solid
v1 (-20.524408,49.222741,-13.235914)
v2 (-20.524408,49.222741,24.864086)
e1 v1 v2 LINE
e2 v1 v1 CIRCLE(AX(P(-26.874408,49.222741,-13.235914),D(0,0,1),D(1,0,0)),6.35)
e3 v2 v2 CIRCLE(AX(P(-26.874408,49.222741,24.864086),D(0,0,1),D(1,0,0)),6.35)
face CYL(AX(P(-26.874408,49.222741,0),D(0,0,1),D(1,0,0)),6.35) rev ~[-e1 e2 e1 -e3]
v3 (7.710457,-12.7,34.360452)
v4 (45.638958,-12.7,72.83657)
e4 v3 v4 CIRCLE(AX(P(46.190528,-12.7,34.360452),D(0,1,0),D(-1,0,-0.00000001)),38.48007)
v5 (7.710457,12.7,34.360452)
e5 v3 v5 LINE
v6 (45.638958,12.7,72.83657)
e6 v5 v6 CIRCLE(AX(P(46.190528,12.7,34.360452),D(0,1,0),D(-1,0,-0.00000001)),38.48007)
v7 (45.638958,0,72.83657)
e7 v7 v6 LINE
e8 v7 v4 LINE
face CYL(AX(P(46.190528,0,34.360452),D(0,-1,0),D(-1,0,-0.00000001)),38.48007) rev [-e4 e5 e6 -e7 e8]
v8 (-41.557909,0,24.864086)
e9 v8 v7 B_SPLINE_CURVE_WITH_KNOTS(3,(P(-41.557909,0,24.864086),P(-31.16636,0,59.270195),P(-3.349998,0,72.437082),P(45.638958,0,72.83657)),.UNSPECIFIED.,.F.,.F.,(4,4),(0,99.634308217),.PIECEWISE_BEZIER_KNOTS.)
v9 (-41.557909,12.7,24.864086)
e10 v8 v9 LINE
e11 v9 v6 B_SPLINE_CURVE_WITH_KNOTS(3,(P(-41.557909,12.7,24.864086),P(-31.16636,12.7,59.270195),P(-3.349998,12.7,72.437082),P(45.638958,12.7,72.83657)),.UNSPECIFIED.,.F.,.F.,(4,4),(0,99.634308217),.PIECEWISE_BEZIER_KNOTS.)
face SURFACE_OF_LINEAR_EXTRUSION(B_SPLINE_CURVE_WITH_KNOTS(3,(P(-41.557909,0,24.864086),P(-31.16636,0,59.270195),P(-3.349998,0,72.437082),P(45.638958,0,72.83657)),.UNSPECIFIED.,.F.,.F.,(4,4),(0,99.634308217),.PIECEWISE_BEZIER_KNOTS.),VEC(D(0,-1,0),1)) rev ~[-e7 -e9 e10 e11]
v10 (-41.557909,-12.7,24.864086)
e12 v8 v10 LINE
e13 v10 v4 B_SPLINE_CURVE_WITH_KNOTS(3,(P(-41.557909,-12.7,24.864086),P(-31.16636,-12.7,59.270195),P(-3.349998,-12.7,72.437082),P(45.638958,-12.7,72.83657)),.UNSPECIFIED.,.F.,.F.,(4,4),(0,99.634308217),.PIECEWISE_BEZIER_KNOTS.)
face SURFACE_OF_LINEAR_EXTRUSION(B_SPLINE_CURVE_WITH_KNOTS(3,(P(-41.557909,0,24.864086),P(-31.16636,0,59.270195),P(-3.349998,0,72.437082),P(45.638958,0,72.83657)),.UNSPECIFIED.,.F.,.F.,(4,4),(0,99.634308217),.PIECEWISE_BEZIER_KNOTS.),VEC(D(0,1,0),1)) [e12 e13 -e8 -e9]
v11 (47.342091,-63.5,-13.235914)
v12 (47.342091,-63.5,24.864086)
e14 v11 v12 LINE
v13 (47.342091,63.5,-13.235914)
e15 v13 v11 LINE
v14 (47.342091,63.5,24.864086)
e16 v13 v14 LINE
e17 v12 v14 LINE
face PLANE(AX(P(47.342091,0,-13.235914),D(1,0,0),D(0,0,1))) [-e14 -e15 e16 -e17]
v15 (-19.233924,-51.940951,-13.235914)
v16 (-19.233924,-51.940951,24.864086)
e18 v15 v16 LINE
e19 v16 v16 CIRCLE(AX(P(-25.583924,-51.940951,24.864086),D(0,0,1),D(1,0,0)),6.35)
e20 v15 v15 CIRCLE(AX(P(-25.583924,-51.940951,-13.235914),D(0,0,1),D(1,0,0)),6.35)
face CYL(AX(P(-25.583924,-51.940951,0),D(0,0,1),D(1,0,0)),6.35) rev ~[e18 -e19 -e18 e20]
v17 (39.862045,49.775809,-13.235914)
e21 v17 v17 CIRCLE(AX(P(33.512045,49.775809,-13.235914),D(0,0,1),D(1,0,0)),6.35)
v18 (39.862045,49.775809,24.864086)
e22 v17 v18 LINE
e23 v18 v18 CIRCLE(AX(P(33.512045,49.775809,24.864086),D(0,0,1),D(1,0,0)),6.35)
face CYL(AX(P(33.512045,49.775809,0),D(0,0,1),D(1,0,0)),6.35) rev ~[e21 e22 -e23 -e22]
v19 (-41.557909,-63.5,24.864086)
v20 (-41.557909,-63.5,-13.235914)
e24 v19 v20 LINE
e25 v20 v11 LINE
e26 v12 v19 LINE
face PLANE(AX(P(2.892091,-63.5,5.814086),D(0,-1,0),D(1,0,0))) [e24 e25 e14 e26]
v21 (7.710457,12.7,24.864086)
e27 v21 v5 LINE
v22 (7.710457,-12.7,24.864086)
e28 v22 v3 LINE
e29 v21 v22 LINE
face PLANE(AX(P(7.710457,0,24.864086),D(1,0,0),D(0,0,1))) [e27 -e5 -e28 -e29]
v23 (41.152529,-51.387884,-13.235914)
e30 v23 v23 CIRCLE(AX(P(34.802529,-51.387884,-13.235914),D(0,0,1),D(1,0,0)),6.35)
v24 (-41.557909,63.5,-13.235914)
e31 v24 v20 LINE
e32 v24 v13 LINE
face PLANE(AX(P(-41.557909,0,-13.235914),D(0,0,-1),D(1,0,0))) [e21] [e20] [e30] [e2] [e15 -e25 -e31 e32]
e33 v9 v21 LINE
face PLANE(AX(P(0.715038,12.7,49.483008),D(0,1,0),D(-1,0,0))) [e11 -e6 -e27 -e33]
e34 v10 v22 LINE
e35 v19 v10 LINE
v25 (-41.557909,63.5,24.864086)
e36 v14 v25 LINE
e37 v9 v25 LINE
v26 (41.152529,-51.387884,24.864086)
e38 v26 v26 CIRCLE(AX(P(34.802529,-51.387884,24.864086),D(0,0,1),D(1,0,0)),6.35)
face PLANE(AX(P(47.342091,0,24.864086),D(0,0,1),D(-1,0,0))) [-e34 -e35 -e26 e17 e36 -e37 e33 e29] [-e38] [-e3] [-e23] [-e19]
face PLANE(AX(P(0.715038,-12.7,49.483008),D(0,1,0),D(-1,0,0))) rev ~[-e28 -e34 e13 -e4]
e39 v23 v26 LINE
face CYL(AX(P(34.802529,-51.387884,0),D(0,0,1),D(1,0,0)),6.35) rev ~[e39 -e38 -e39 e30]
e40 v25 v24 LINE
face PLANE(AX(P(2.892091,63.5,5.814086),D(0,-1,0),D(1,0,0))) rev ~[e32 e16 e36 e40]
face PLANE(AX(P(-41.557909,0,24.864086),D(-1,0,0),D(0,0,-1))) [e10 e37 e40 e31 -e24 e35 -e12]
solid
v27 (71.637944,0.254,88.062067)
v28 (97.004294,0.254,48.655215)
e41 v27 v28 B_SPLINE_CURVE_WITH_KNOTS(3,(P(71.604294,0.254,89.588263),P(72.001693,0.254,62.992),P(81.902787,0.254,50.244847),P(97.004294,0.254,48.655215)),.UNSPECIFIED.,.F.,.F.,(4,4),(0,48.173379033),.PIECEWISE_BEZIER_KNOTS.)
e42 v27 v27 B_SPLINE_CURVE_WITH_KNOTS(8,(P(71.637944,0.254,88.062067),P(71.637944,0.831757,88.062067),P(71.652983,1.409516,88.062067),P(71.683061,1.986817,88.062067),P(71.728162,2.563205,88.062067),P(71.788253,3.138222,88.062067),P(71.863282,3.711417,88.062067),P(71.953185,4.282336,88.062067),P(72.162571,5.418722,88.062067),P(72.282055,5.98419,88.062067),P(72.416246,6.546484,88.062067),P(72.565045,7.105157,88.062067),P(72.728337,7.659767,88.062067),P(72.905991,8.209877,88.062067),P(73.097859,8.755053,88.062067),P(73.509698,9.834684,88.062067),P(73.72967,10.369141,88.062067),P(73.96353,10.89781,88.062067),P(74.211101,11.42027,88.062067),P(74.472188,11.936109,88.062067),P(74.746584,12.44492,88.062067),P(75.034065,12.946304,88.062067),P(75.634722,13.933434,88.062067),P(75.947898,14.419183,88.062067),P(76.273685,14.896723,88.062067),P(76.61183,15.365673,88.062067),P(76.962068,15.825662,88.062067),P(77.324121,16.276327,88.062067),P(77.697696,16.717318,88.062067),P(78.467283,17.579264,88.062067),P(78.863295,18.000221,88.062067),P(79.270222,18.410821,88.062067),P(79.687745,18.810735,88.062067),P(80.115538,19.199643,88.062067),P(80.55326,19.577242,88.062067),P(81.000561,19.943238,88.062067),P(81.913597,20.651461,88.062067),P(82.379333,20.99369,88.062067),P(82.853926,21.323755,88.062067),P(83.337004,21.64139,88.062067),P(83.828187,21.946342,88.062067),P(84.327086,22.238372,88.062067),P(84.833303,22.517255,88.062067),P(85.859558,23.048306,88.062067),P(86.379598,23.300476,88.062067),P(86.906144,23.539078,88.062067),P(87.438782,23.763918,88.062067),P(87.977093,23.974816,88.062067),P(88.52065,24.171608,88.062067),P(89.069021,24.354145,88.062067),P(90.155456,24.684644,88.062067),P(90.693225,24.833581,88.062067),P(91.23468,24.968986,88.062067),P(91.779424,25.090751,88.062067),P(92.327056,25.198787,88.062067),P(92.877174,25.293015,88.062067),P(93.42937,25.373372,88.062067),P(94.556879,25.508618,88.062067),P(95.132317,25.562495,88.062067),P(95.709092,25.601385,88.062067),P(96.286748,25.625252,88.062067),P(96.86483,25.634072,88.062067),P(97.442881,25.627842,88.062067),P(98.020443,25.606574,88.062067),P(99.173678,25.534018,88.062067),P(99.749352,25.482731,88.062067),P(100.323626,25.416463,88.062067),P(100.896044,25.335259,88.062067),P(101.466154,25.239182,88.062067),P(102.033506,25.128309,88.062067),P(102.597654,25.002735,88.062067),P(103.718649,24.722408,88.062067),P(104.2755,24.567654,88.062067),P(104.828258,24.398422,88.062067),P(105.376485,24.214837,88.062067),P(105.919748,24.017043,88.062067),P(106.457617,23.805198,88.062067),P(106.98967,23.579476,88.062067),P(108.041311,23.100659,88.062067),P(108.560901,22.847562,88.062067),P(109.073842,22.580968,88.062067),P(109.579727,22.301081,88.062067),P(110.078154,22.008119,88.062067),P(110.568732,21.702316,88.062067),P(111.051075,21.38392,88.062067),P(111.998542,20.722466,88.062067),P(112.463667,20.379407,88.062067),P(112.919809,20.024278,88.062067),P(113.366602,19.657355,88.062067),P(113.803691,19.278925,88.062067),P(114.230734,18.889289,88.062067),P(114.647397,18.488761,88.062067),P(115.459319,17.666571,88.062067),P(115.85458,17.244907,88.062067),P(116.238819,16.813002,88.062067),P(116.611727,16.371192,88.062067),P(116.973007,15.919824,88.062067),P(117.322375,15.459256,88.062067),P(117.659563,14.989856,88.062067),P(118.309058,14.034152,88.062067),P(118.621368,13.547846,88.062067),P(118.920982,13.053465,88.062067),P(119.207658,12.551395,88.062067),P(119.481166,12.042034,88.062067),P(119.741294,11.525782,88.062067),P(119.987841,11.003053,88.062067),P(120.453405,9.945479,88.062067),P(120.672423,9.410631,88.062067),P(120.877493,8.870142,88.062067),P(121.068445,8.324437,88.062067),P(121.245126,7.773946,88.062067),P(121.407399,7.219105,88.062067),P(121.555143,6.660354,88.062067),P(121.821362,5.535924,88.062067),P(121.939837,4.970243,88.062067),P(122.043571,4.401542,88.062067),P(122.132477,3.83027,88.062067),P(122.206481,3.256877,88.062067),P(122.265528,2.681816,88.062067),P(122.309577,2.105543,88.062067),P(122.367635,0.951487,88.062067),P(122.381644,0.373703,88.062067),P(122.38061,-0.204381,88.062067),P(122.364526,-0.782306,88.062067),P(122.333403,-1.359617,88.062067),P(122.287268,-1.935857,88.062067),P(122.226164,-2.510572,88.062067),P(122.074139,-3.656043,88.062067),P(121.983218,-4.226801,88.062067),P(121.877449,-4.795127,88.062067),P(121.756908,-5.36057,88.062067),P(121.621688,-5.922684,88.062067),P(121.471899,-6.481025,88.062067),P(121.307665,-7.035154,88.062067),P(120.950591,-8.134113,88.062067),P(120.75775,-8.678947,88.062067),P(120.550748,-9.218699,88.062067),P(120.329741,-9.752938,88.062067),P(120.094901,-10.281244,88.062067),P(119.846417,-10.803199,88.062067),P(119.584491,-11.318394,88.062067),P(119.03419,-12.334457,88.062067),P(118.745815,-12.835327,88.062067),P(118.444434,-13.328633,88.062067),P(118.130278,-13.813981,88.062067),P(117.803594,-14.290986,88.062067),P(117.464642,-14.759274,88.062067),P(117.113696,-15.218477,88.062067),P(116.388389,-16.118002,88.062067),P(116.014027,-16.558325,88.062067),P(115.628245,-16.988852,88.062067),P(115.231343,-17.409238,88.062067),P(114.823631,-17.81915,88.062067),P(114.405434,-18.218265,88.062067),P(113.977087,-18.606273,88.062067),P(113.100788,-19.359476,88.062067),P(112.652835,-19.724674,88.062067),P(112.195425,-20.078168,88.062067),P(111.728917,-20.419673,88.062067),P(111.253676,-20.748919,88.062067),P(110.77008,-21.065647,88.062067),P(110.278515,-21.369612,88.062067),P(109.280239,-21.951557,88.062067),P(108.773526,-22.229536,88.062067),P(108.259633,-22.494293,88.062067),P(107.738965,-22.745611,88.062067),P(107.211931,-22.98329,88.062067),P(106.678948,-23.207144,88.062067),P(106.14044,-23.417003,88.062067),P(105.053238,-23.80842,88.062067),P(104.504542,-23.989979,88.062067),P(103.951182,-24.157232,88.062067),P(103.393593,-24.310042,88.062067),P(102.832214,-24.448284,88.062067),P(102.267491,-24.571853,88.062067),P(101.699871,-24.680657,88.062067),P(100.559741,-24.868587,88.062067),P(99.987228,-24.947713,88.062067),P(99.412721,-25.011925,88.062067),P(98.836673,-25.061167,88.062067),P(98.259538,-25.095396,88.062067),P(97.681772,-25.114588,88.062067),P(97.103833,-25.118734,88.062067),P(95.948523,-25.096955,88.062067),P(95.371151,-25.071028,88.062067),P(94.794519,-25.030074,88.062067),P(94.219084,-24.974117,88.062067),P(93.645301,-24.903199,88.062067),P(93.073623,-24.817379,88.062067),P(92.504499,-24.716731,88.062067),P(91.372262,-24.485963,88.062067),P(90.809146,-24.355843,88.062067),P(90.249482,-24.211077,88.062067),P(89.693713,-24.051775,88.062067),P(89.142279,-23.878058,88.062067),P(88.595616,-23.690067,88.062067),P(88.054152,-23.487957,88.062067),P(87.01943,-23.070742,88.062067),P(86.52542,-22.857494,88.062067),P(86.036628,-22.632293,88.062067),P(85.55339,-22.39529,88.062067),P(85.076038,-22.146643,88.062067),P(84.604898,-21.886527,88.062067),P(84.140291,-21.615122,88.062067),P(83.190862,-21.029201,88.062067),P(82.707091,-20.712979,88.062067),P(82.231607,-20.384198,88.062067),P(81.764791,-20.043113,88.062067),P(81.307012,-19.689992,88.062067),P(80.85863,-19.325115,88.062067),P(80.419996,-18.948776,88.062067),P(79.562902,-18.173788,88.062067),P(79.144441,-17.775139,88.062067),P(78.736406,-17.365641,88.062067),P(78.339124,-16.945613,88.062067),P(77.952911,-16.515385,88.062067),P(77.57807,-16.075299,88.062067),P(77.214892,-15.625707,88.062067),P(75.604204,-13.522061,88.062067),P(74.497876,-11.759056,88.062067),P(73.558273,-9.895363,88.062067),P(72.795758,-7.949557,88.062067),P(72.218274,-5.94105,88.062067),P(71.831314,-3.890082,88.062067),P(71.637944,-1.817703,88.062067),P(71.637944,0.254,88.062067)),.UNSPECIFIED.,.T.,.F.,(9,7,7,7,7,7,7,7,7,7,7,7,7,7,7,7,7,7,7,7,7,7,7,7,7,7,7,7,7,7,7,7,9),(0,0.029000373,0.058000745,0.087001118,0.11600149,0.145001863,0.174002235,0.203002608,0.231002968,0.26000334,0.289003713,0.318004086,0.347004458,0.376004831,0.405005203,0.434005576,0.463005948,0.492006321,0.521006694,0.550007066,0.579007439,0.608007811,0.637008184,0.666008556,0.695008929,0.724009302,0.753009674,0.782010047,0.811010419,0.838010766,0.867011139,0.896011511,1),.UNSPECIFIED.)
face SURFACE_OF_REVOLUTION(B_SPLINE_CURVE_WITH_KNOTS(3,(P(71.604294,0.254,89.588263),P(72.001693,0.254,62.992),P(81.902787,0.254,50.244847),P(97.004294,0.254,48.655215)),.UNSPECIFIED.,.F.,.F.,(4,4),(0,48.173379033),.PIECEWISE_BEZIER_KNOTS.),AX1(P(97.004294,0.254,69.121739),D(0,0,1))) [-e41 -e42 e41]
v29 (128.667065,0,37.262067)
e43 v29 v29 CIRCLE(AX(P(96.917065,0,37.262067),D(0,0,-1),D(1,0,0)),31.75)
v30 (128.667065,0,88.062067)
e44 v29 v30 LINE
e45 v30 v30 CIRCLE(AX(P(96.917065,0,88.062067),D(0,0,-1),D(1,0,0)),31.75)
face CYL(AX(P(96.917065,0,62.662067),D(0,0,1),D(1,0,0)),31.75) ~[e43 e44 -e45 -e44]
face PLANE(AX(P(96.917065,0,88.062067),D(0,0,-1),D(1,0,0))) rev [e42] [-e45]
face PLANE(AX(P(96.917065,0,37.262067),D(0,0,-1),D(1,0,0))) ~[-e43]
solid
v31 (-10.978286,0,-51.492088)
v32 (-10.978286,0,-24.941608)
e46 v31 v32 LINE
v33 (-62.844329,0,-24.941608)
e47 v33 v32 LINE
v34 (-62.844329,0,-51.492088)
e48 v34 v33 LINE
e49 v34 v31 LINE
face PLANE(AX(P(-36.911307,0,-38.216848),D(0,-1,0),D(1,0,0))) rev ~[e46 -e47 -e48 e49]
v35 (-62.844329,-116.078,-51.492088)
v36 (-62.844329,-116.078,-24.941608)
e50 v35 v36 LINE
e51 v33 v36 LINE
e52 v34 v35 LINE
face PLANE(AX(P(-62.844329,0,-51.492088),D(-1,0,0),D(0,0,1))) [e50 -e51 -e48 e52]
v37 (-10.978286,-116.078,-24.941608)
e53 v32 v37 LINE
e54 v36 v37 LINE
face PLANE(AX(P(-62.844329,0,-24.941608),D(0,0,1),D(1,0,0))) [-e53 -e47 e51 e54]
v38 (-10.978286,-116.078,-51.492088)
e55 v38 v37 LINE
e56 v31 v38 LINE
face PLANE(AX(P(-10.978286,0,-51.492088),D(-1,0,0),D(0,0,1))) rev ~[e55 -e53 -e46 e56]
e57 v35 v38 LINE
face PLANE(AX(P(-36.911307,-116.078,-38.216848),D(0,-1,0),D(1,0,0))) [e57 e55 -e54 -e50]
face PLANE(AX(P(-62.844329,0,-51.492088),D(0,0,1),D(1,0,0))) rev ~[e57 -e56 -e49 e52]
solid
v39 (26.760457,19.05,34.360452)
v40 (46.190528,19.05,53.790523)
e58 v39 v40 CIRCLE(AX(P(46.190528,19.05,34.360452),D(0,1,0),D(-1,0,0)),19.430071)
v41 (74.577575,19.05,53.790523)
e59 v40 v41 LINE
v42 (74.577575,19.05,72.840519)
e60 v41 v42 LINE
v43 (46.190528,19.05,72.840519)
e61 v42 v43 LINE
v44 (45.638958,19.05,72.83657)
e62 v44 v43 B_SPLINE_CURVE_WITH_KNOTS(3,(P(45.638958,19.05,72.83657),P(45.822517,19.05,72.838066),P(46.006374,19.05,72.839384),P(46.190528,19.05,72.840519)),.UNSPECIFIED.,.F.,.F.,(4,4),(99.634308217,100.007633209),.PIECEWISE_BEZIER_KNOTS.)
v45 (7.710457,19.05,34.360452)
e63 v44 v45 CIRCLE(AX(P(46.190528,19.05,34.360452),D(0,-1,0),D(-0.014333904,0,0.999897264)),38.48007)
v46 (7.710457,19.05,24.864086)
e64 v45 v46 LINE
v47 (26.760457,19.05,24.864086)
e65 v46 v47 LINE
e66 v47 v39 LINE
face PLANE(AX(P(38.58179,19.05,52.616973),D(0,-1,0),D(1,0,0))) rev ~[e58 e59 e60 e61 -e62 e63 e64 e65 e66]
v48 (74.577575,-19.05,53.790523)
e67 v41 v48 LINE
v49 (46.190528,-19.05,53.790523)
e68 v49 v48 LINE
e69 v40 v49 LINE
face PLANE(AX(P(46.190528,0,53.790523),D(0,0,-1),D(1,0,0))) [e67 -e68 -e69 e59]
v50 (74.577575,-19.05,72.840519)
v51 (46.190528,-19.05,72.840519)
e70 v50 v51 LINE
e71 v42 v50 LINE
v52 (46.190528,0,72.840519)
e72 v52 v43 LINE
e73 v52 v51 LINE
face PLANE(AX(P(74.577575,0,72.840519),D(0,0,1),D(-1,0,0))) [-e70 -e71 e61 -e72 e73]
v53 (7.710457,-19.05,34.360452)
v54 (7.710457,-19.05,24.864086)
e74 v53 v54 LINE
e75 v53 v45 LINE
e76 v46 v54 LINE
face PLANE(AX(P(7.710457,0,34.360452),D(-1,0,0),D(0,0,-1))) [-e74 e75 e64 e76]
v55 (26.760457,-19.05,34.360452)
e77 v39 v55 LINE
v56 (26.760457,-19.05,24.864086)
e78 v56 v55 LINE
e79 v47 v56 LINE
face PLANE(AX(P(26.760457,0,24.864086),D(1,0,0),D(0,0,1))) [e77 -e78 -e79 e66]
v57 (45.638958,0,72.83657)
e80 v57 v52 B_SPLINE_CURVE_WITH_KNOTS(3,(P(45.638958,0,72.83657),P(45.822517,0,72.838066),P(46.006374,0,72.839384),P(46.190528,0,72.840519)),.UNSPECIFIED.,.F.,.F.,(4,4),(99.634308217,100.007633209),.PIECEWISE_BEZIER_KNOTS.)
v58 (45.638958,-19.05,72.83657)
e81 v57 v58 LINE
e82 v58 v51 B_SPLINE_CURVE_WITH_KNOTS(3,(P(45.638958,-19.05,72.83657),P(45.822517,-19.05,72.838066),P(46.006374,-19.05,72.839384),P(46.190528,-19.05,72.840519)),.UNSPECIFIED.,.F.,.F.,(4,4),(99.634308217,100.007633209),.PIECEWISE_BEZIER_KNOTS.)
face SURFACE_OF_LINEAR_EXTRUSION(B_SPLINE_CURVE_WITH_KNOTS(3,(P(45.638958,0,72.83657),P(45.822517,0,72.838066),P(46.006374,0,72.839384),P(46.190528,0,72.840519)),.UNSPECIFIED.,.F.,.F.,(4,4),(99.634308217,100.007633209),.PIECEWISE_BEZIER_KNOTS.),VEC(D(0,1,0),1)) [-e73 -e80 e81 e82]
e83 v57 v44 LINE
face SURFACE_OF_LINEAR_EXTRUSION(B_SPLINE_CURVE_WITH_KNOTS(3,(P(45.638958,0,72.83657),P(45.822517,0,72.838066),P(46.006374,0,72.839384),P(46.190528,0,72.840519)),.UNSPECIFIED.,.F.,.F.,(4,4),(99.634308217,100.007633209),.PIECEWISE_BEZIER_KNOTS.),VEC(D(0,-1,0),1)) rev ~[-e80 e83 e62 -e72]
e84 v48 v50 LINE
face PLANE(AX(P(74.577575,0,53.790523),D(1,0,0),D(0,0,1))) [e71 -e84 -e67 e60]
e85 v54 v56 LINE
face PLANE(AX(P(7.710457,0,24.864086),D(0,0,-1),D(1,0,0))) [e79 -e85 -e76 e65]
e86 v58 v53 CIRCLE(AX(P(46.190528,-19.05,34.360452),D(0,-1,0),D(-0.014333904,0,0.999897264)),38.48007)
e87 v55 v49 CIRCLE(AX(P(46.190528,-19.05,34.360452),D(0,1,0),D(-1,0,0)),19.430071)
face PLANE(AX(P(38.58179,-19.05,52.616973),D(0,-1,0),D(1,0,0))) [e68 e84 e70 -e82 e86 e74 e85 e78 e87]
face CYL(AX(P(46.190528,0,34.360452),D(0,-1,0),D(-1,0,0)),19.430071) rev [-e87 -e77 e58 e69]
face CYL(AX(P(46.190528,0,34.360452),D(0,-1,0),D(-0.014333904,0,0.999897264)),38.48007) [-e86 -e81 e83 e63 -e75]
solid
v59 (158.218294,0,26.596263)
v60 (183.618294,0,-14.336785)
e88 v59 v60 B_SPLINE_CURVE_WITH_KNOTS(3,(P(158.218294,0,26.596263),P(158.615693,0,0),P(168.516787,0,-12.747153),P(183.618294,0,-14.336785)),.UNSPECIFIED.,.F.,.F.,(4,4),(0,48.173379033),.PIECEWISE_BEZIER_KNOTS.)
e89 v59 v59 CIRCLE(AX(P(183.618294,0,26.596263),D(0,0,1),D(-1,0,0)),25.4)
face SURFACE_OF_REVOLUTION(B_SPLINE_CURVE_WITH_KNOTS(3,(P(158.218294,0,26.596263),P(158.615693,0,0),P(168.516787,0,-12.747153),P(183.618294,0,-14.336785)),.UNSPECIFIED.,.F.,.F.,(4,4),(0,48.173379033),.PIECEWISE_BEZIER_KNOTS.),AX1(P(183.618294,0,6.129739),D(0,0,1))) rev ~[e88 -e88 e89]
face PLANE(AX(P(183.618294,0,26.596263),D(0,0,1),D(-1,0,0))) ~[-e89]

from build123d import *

# Parameters (mm, degrees)
F1_DEPTH  = 63.5
F2_DEPTH  = 12.7
F0_W      = 31.75
F0_H      = 50.8
F4_DEPTH  = 19.05
F8_R      = 6.35
F9_DEPTH  = 38.1
F11_W     = 51.8660424277
F11_H     = 26.5504792333
F12_DEPTH = 116.078


# Not quite as in the source:
# - ends of sketch curves that miss each other by under 0.0002 mm in the source are joined


with BuildPart() as f1:
    # F0 (on Front) → F1 (new body, symmetric)
    with BuildSketch(Plane.XZ):
        Polygon((7.7104573138, 24.8640864372), (-41.5579093681, 24.8640864372), (-41.5579093681, -13.2359135628), (47.3420906319, -13.2359135628), (47.3420906319, 24.8640864372), (26.7604570836, 24.8640864372), align=None)
    extrude(amount=F1_DEPTH, both=True)

    # F0 (on Front) → F2 (join, symmetric)
    with BuildSketch(Plane.XZ):
        with BuildLine():
            add(Edge.make_bspline(
                [(-41.5579093681, 24.8640864372), (-31.1663596882, 59.2701950139), (-3.3499980814, 72.437082025), (45.6389581324, 72.8365695774)],
                knots=[0, 0, 0, 0, 99.6343082165, 99.6343082165, 99.6343082165, 99.6343082165], degree=3))
            Line((-41.5579093681, 24.8640864372), (7.7104573138, 24.8640864372))
            Line((7.7104573138, 24.8640864372), (7.7104573138, 34.3604520069))
            ThreePointArc((7.7104573138, 34.3604520069), (18.7866933694, 61.3742578065), (45.6389581324, 72.8365695774))
        make_face()
    extrude(amount=F2_DEPTH, both=True)


with BuildPart() as f3:
    # F0 (on Front) → F3 (revolve)
    with BuildSketch(Plane.XZ):
        with Locations((112.7920650244, 62.6620671988)):
            Rectangle(F0_W, F0_H)
    revolve(axis=Axis((96.9170650244, 0, 62.6620671988), (0, 0, -1)))


with BuildPart() as f4:
    # F0 (on Front) → F4 (new body, symmetric)
    with BuildSketch(Plane.XZ):
        with BuildLine():
            Line((7.7104573138, 34.3604520069), (7.7104573138, 24.8640864372))
            Line((7.7104573138, 24.8640864372), (26.7604570836, 24.8640864372))
            Line((26.7604570836, 24.8640864372), (26.7604570836, 34.3604520069))
            ThreePointArc((26.7604570836, 34.3604520069), (32.4513930763, 48.0995868632), (46.1905279326, 53.7905228559))
            Line((46.1905279326, 53.7905228559), (74.5775754276, 53.7905228559))
            Line((74.5775754276, 53.7905228559), (74.5775754276, 72.8405192494))
            Line((74.5775754276, 72.8405192494), (46.1905279326, 72.8405192494))
            add(Edge.make_bspline(
                [(45.6389581324, 72.8365695774), (45.8225174109, 72.8380664382), (46.0063739453, 72.8393840491), (46.1905279326, 72.8405192494)],
                knots=[99.6343082165, 99.6343082165, 99.6343082165, 99.6343082165, 100.0076332094, 100.0076332094, 100.0076332094, 100.0076332094], degree=3))
            ThreePointArc((45.6389581324, 72.8365695774), (18.7866933694, 61.3742578065), (7.7104573138, 34.3604520069))
        make_face()
    extrude(amount=F4_DEPTH, both=True)


with BuildPart() as f5:
    # F0 (on Front) → F5 (revolve)
    with BuildSketch(Plane.XZ):
        with BuildLine():
            Line((183.6182943821, 26.596263051), (158.2182943821, 26.596263051))
            add(Edge.make_bspline(
                [(158.2182943821, 26.596263051), (158.61569345, 0), (168.516787076, -12.7471527085), (183.6182943821, -14.3367853016)],
                knots=[0, 0, 0, 0, 48.1733790328, 48.1733790328, 48.1733790328, 48.1733790328], degree=3))
            Line((183.6182943821, -14.3367853016), (183.6182943821, 26.596263051))
        make_face()
    revolve(axis=Axis((183.6182943821, 0, 6.1297388747), (0, 0, 1)))


with BuildPart() as f6_1:
    # F6: copy of F5
    add(f5.part.moved(Location((-86.614, 0.254, 62.992))))


with BuildPart() as f3_1:
    add(f3.part)

    # F7: cut F6_1
    add(f6_1.part, mode=Mode.SUBTRACT)


with BuildPart() as f9:
    # F8 (on Top) → F9 (new body, symmetric)
    with BuildSketch(Plane.XY):
        with Locations((-26.8744081259, 49.222741276)):
            Circle(F8_R)
    extrude(amount=F9_DEPTH, both=True)


with BuildPart() as f9b:
    # F8 (on Top) → F9, piece 2 (new body, symmetric)
    with BuildSketch(Plane.XY):
        with Locations((33.5120453119, 49.7758090496)):
            Circle(F8_R)
    extrude(amount=F9_DEPTH, both=True)


with BuildPart() as f9c:
    # F8 (on Top) → F9, piece 3 (new body, symmetric)
    with BuildSketch(Plane.XY):
        with Locations((-25.5839244187, -51.9409514964)):
            Circle(F8_R)
    extrude(amount=F9_DEPTH, both=True)


with BuildPart() as f9d:
    # F8 (on Top) → F9, piece 4 (new body, symmetric)
    with BuildSketch(Plane.XY):
        with Locations((34.8025290191, -51.3878837228)):
            Circle(F8_R)
    extrude(amount=F9_DEPTH, both=True)


with BuildPart() as f1_1:
    add(f1.part)

    # F10: cut F9c, F9d, F9, F9b
    add(f9c.part, mode=Mode.SUBTRACT)
    add(f9d.part, mode=Mode.SUBTRACT)
    add(f9.part, mode=Mode.SUBTRACT)
    add(f9b.part, mode=Mode.SUBTRACT)


with BuildPart() as f12:
    # F11 (on Front) → F12 (new body)
    with BuildSketch(Plane.XZ):
        with Locations((-36.9113073684, -38.2168479264)):
            Rectangle(F11_W, F11_H)
    extrude(amount=F12_DEPTH)


solid = Compound([f4.part, f5.part, f3_1.part, f1_1.part, f12.part])
